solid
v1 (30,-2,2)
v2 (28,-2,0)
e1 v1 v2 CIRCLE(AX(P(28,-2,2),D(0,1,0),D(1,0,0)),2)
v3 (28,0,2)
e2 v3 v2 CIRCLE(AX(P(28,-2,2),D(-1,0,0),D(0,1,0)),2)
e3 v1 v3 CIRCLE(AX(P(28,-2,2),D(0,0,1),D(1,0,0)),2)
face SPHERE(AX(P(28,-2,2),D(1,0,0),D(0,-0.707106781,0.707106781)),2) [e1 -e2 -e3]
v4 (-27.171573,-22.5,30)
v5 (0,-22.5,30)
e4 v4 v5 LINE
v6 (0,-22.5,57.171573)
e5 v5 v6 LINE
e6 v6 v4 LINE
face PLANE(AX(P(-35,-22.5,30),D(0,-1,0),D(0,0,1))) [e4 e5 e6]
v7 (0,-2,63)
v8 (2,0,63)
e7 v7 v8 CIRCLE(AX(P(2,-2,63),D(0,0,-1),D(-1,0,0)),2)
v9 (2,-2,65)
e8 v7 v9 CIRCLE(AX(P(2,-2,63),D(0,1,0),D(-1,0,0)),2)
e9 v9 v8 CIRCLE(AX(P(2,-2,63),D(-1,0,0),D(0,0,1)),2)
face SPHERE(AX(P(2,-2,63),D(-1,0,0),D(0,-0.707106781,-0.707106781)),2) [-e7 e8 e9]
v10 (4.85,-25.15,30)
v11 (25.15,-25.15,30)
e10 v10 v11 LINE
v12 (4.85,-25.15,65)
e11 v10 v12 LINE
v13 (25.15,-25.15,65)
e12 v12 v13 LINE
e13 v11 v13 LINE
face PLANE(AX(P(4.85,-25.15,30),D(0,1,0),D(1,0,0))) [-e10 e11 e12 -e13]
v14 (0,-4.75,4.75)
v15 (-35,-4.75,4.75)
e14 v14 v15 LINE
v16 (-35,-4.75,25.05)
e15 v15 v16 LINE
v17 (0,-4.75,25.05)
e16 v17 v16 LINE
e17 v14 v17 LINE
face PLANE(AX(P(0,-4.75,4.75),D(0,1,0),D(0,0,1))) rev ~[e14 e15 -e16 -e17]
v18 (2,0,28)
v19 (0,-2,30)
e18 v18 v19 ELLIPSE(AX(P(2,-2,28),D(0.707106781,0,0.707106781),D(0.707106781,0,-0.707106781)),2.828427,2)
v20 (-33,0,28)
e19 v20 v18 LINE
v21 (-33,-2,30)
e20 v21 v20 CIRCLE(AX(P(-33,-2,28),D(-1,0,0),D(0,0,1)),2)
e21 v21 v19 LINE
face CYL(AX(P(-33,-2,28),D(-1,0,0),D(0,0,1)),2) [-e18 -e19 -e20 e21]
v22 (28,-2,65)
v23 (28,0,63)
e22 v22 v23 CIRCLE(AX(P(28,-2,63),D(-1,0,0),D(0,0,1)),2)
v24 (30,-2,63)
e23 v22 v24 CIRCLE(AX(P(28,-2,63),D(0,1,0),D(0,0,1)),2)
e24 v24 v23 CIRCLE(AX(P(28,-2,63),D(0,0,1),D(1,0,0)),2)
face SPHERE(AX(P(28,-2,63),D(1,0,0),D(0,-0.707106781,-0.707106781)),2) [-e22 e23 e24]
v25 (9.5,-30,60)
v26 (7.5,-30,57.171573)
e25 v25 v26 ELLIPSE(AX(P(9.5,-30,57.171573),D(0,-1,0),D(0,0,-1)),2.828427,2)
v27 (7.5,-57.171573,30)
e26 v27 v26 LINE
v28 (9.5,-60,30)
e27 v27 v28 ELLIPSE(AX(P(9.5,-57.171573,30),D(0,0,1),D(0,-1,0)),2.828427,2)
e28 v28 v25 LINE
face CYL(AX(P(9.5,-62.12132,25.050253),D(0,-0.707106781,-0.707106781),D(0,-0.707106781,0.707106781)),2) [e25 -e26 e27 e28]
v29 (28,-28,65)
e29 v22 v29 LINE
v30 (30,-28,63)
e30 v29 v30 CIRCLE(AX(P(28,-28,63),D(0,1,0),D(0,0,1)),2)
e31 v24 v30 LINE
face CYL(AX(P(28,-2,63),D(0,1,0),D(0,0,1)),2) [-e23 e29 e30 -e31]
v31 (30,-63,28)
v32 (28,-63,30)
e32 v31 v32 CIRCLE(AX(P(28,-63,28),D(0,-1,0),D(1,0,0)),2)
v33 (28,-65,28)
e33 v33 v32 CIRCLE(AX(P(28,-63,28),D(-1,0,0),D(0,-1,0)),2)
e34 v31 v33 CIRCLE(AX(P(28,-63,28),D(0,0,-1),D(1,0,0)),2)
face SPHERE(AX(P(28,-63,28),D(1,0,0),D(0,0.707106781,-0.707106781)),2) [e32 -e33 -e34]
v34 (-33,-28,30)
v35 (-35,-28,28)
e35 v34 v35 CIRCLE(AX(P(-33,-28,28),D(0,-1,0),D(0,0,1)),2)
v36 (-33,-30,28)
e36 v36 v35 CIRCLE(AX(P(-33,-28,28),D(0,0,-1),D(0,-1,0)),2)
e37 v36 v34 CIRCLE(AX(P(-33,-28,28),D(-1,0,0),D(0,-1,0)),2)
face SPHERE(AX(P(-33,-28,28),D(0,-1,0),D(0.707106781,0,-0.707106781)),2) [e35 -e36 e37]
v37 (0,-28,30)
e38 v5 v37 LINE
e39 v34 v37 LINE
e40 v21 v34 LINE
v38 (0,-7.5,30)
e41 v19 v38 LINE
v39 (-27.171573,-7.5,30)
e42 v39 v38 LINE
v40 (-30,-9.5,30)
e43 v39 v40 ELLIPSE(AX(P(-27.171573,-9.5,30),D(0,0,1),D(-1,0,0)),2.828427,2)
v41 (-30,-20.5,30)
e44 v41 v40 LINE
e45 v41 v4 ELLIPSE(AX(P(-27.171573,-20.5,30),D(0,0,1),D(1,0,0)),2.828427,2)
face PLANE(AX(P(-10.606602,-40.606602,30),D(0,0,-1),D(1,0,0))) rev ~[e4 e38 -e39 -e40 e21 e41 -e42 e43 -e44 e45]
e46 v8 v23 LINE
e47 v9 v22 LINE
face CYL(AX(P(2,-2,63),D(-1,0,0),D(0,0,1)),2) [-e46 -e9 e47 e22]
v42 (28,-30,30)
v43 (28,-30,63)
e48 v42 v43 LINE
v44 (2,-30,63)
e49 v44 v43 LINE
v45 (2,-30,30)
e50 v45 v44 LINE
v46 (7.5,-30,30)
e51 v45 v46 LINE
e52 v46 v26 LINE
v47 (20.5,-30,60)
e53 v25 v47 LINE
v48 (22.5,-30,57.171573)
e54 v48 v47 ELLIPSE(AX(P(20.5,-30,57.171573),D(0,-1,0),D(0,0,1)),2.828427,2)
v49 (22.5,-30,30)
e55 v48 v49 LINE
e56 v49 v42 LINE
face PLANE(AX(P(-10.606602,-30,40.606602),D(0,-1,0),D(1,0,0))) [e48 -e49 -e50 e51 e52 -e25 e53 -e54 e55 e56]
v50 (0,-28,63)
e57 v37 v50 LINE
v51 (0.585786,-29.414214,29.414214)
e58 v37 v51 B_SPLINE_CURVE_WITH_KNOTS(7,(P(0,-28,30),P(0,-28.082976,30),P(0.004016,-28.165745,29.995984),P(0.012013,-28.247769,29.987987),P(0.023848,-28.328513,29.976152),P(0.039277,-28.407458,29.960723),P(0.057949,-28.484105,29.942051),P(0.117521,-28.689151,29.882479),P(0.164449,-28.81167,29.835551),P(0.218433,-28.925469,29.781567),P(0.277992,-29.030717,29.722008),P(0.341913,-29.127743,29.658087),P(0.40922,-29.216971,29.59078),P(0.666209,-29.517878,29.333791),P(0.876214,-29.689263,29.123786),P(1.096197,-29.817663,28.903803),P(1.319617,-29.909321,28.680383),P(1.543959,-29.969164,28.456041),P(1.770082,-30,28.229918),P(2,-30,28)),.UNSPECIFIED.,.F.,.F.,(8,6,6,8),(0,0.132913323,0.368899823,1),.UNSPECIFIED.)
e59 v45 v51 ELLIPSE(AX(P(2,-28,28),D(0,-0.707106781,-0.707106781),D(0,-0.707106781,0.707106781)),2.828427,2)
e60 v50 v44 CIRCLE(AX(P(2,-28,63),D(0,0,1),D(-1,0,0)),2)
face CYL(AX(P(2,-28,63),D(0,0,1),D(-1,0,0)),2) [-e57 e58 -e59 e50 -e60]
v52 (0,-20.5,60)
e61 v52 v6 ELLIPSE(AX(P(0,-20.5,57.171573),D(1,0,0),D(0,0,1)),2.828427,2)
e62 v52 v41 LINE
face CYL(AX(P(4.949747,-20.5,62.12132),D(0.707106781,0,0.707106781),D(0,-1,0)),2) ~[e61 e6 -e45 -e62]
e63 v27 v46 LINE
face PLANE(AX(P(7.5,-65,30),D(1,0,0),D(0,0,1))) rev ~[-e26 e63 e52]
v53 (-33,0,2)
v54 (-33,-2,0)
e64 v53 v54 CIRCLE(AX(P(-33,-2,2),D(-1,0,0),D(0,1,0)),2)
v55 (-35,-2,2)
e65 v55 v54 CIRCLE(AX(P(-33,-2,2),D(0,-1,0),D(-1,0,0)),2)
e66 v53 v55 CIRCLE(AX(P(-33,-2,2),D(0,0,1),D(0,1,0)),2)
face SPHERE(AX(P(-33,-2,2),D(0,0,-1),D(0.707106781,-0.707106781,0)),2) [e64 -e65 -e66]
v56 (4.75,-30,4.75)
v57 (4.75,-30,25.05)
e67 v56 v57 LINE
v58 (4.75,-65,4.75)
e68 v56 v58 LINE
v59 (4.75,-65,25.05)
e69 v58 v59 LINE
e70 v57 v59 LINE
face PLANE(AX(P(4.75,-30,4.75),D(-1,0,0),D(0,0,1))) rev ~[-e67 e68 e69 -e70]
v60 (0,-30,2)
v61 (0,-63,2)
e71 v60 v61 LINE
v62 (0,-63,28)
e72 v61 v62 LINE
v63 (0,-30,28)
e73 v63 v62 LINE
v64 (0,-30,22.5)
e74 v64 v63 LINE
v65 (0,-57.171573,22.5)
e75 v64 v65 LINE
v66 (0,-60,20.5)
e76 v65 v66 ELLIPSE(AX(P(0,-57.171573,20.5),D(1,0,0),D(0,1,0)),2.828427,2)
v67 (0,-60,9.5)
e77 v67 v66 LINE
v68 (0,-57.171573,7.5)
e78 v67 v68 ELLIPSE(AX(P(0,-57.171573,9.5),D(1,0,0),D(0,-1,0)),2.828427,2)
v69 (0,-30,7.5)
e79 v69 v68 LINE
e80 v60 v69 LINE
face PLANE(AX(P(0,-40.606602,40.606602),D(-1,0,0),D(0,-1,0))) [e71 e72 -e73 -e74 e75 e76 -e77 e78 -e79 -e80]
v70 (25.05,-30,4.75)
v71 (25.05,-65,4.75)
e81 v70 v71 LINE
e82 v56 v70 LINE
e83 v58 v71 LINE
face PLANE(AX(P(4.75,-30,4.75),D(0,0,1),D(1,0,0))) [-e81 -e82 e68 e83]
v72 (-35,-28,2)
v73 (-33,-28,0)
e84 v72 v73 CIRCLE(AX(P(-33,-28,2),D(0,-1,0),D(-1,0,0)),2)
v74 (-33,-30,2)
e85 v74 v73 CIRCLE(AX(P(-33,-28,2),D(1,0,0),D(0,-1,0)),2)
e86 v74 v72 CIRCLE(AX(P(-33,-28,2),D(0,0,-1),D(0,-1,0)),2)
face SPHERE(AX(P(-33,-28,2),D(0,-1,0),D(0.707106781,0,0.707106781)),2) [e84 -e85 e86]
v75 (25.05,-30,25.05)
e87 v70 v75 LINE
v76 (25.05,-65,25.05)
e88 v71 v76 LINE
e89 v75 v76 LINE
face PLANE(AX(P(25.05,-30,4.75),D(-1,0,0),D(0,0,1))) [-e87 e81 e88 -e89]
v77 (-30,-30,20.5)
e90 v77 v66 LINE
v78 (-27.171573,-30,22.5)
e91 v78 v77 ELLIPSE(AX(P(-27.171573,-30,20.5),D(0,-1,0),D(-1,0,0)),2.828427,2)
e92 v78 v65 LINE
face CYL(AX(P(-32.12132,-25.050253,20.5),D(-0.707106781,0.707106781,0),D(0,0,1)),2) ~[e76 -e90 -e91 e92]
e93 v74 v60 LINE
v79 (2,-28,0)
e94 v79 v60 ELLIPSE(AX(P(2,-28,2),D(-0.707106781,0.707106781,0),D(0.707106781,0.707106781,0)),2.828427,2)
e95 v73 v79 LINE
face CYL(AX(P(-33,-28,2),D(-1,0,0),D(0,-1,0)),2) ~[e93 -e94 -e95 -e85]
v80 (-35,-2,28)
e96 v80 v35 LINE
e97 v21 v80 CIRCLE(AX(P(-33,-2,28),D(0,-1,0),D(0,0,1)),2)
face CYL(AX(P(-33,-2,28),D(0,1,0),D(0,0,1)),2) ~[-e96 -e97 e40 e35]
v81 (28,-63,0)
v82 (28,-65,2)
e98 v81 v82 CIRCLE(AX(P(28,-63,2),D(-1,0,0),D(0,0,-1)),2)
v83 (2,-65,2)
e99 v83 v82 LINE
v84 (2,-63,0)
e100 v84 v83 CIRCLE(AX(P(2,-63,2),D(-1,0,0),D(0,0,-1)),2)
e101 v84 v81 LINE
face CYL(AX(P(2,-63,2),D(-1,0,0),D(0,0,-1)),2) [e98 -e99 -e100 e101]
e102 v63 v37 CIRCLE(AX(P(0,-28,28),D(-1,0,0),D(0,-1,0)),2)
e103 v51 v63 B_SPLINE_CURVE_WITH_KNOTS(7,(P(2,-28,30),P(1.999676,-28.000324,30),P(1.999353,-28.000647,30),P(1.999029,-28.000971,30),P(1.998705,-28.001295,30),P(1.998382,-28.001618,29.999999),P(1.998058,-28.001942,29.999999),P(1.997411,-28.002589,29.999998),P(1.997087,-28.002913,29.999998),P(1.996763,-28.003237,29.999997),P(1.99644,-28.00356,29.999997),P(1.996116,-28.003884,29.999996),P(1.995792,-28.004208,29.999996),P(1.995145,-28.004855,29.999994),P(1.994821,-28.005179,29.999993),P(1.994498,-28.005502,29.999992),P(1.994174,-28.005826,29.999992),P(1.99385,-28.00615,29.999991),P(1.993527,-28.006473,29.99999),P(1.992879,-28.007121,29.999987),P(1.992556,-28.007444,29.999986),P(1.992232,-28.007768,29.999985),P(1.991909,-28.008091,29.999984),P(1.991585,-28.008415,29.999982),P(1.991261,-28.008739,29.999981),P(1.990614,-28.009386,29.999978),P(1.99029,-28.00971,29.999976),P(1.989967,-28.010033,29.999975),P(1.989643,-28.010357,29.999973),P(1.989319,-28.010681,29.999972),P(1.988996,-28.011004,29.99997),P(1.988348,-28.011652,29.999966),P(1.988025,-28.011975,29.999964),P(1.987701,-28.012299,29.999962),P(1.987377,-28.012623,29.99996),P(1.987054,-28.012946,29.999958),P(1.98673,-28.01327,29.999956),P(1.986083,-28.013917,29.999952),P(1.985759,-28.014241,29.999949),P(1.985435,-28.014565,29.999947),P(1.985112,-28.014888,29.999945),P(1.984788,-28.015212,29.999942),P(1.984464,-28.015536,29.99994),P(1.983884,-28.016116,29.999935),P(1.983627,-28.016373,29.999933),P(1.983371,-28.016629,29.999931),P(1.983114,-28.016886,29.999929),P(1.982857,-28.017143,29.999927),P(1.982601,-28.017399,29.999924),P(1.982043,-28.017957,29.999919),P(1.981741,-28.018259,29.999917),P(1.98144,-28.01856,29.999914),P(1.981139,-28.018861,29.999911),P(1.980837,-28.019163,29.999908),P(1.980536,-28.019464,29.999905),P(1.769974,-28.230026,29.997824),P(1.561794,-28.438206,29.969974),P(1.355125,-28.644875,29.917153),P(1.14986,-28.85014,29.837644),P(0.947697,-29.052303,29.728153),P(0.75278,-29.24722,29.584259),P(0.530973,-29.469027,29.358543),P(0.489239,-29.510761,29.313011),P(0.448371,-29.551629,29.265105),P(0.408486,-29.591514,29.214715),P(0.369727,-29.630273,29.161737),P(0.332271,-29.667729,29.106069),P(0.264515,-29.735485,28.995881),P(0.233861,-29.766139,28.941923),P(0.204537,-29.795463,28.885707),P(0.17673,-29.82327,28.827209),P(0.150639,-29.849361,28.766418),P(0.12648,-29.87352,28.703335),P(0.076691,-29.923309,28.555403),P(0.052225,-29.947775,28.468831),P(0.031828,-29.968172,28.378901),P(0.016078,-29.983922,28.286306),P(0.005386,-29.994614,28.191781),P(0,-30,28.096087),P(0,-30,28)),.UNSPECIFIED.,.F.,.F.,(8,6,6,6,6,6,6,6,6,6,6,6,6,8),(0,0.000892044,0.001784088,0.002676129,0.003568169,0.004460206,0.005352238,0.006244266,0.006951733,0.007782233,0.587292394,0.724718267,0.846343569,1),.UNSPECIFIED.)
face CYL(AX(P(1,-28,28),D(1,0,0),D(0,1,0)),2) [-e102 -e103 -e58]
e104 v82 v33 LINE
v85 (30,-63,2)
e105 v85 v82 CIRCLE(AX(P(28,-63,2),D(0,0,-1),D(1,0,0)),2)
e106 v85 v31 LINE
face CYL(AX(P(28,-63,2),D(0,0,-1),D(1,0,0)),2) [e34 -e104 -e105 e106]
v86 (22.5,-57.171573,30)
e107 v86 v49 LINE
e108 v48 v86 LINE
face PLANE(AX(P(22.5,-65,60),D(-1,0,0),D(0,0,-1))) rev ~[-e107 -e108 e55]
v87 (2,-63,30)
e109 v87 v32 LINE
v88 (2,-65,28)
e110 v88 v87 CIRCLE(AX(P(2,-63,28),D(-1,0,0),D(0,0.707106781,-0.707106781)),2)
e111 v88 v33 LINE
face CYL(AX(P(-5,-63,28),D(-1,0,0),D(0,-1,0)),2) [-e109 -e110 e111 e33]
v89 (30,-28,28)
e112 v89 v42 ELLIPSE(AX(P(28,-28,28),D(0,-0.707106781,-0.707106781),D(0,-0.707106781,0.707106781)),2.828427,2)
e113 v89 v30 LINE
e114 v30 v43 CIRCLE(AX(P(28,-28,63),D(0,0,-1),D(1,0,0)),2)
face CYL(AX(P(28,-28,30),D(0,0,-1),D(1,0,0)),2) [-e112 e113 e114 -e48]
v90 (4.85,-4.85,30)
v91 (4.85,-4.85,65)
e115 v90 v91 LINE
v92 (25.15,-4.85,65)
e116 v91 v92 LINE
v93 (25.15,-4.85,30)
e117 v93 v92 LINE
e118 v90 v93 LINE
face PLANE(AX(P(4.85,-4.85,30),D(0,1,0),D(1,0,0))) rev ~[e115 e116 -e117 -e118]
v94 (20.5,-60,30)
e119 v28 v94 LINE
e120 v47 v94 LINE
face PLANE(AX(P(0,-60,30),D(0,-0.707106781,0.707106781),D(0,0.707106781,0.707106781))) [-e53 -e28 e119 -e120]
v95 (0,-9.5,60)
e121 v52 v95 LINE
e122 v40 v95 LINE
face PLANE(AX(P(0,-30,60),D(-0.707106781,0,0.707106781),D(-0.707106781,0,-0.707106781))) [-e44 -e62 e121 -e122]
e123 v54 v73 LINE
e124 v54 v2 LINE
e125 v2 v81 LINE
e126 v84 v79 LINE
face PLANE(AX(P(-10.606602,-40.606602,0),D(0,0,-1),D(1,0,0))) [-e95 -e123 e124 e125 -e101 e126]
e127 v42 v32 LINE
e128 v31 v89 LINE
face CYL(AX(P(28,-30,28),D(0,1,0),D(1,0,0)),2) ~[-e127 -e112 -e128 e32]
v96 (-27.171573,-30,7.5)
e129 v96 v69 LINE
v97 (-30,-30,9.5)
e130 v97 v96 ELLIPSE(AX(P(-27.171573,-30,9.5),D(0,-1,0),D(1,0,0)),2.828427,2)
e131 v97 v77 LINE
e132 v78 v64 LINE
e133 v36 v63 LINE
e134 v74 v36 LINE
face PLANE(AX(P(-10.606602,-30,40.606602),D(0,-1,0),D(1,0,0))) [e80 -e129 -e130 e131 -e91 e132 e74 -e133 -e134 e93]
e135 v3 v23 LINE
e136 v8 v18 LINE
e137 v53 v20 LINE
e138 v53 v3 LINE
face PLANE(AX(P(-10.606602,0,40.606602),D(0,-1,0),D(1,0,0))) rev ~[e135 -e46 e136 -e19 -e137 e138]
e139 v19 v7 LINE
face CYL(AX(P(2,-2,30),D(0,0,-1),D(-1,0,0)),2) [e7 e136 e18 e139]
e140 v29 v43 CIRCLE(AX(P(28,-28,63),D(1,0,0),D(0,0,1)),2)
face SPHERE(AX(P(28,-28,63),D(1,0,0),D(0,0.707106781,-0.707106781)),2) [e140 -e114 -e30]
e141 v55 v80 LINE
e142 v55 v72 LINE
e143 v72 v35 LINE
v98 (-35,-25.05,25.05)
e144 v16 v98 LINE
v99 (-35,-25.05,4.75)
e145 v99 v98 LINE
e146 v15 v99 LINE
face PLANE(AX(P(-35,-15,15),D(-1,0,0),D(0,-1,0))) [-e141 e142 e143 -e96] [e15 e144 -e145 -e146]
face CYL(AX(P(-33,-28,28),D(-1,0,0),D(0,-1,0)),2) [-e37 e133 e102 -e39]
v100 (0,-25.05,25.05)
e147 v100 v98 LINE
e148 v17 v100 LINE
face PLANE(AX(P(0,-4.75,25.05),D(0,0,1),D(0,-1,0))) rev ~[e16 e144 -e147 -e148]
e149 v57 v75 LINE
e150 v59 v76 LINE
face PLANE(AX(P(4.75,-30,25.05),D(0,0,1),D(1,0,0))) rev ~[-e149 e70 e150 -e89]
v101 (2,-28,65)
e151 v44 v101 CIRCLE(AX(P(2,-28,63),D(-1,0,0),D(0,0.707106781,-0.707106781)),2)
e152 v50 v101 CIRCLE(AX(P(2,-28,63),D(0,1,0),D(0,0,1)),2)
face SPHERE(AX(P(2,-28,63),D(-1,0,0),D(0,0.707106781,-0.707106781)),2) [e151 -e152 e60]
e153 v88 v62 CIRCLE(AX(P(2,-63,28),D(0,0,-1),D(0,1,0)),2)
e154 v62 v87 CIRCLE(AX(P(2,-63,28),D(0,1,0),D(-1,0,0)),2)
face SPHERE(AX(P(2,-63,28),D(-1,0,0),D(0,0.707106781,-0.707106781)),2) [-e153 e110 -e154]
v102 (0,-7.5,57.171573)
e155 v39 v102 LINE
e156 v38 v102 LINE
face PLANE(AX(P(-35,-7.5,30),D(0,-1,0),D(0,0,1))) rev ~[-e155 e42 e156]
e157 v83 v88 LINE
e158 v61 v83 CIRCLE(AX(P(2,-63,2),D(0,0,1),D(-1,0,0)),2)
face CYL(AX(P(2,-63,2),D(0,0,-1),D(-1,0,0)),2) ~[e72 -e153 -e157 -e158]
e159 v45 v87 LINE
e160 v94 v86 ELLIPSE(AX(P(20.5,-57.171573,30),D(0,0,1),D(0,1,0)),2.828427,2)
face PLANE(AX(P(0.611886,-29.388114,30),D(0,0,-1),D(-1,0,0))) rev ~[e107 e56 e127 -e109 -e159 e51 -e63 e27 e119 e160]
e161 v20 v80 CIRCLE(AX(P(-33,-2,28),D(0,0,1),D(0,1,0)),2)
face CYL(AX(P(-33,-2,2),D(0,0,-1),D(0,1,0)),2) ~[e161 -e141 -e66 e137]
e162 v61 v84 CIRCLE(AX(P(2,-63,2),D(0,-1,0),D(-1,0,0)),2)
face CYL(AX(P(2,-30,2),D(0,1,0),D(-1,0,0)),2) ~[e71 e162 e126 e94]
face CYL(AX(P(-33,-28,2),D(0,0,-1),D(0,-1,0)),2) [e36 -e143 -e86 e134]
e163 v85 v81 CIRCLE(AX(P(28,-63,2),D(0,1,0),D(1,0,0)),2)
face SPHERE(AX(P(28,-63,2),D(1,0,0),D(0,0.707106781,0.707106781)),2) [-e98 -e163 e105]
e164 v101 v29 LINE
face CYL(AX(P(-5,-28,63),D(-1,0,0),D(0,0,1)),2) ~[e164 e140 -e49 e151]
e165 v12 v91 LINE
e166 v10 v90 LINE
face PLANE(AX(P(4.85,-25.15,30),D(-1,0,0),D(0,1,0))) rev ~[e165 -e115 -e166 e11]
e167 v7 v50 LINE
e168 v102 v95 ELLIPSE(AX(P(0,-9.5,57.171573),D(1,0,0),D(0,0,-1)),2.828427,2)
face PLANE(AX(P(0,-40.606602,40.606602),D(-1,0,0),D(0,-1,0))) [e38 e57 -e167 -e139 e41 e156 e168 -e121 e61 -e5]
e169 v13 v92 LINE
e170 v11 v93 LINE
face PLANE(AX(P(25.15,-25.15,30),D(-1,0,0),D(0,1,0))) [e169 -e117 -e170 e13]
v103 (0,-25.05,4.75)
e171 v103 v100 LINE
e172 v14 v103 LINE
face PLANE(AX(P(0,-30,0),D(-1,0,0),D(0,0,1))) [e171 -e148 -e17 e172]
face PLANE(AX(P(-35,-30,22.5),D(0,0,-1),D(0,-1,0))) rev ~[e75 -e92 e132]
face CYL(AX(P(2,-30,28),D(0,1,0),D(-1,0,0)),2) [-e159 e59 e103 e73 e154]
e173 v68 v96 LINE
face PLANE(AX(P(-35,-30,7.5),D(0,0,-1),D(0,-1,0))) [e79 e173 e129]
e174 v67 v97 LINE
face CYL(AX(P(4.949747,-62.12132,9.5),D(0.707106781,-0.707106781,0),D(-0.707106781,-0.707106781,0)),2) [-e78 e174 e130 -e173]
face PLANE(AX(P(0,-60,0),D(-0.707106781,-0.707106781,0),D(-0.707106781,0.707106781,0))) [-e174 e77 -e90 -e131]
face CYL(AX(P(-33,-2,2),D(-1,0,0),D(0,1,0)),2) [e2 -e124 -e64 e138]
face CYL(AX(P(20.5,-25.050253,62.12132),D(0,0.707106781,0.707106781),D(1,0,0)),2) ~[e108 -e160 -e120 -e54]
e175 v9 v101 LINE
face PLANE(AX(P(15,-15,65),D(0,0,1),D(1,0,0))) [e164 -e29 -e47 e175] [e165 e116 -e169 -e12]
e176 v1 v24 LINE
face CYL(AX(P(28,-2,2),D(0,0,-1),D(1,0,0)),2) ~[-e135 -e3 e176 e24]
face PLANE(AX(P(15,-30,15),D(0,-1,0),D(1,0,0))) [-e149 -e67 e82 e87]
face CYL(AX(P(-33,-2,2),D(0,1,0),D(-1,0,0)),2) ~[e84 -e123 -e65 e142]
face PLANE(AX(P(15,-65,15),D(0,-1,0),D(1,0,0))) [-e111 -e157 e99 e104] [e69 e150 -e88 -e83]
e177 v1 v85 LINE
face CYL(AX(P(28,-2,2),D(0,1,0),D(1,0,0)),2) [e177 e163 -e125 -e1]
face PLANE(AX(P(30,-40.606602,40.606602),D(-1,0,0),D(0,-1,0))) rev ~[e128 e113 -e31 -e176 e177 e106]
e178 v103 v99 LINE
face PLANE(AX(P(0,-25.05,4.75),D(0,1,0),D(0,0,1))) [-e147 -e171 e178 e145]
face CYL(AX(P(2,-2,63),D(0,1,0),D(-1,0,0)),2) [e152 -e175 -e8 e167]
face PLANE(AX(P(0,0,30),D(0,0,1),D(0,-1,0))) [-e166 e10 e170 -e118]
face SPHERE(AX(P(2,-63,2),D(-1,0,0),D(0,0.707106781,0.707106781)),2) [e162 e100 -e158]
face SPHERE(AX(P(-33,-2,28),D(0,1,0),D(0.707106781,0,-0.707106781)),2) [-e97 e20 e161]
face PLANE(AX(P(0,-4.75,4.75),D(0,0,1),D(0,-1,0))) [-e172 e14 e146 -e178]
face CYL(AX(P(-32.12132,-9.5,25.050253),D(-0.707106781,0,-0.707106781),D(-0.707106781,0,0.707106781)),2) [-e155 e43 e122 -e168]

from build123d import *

# Parameters (mm, degrees)
F0_W           = 30
F0_H           = 30
F1_DEPTH       = 30
F2_W           = 30
F2_H           = 30
F2_W_2         = 20.3
F2_H_2         = 20.3
F3_DEPTH       = 35
F4_W           = 30
F4_H           = 30
F4_W_2         = 20.3
F4_H_2         = 20.3
F5_DEPTH       = 35
F6_W           = 30
F6_H           = 30
F6_W_2         = 20.3
F6_H_2         = 20.3
F7_DEPTH       = 35
F9_DEPTH       = 30
F10_W          = 7.5
F10_H          = 30
F11_DEPTH      = 35
F13_DEPTH      = 30
F15_DEPTH      = 35
F17_DEPTH      = 30
F18_W          = 35
F18_H          = 7.5
F19_DEPTH      = 35
F20_T1_DEPTH   = 26
F20_T3_DEPTH   = 26
F20_T5_DEPTH   = 33
F20_T7_DEPTH   = 33
F20_T9_DEPTH   = 26
F20_T11_DEPTH  = 33
F20_T13_DEPTH  = 61
F20_T15_DEPTH  = 61
F20_T17_DEPTH  = 33
F20_T19_DEPTH  = 33
F20_T21_DEPTH  = 33
F20_T23_DEPTH  = 61
F20_S27_W      = 2
F20_S27_H      = 2
F20_T28_DEPTH  = 2
F20_S33_W      = 2
F20_S33_H      = 2
F20_T34_DEPTH  = 2
F20_S39_W      = 2
F20_S39_H      = 2
F20_T40_DEPTH  = 2
F20_S45_W      = 2
F20_S45_H      = 2
F20_T46_DEPTH  = 2
F20_S51_W      = 2
F20_S51_H      = 2
F20_T52_DEPTH  = 2
F20_S57_W      = 2
F20_S57_H      = 2
F20_T58_DEPTH  = 2
F20_S63_W      = 2
F20_S63_H      = 2
F20_T64_DEPTH  = 2
F20_S69_W      = 2
F20_S69_H      = 2
F20_T70_DEPTH  = 2
F20_S75_W      = 2
F20_S75_H      = 2
F20_T76_DEPTH  = 2
F20_S81_W      = 2
F20_S81_H      = 2
F20_T82_DEPTH  = 2
F20_S87_W      = 2
F20_S87_H      = 2
F20_T88_DEPTH  = 2
F20_T94_DEPTH  = 52.4264068712
F20_T100_DEPTH = 52.4264068712
F20_T106_DEPTH = 52.4264068712
F20_T112_DEPTH = 52.4264068712
F20_T118_DEPTH = 52.4264068712
F20_T124_DEPTH = 52.4264068712
F20_T131_DEPTH = 38
F20_T135_DEPTH = 38
F20_T142_DEPTH = 38
F20_T146_DEPTH = 38
F20_T153_DEPTH = 38
F20_T157_DEPTH = 38
F21_T1_DEPTH   = 33
F21_T3_DEPTH   = 33
F21_S7_W       = 2
F21_S7_H       = 2
F21_T8_DEPTH   = 2
F21_S13_W      = 2
F21_S13_H      = 2
F21_T14_DEPTH  = 2
F21_T21_DEPTH  = 38
F21_S23_R      = 1.9999999999
F21_T24_DEPTH  = 21
F21_T27_DEPTH  = 38
F21_S28_R      = 1.9999999999
F21_T29_DEPTH  = 21


# Not quite as in the source:
# - a fillet or chamfer that OpenCascade refuses, or shapes differently, is made with other operations: its cross-section is extruded or revolved along the edge and cut away or added


with BuildPart() as f1:
    # F0 (on Front) → F1 (new body)
    with BuildSketch(Plane.XZ):
        with Locations((15, 15)):
            Rectangle(F0_W, F0_H)
    extrude(amount=F1_DEPTH)

    # F2 (on face) → F3 (join)
    with BuildSketch(Plane.XZ.offset(30)):
        with Locations((15, 15)):
            Rectangle(F2_W, F2_H)
        with Locations((14.9, 14.9)):
            Rectangle(F2_W_2, F2_H_2, mode=Mode.SUBTRACT)
    extrude(amount=F3_DEPTH)

    # F4 (on face) → F5 (join)
    with BuildSketch(Plane(origin=(0, 0, 0), x_dir=(0, -1, 0), z_dir=(-1, 0, 0))):
        with Locations((15, 15)):
            Rectangle(F4_W, F4_H)
        with Locations((14.9, 14.9)):
            Rectangle(F4_W_2, F4_H_2, mode=Mode.SUBTRACT)
    extrude(amount=F5_DEPTH)

    # F6 (on face) → F7 (join)
    with BuildSketch(Plane.XY.offset(30)):
        with Locations((15, -15)):
            Rectangle(F6_W, F6_H)
        with Locations((15, -15)):
            Rectangle(F6_W_2, F6_H_2, mode=Mode.SUBTRACT)
    extrude(amount=F7_DEPTH)

    # F8 (on face) → F9 (join)
    with BuildSketch(Plane.XZ.offset(30)):
        Polygon((-30, 30), (0, 30), (0, 60), align=None)
    extrude(amount=-F9_DEPTH)

    # F10 (on face) → F11 (cut)
    with BuildSketch(Plane(origin=(-35, 0, 0), x_dir=(0, -1, 0), z_dir=(-1, 0, 0))):
        with Locations((3.75, 45)):
            Rectangle(F10_W, F10_H)
        with Locations((26.25, 45)):
            Rectangle(F10_W, F10_H)
    extrude(amount=-F11_DEPTH, mode=Mode.SUBTRACT)

    # F12 (on face) → F13 (join)
    with BuildSketch(Plane(origin=(0, 0, 0), x_dir=(0, -1, 0), z_dir=(-1, 0, 0))):
        Polygon((30, 60), (30, 30), (60, 30), align=None)
    extrude(amount=-F13_DEPTH)

    # F14 (on face) → F15 (cut)
    with BuildSketch(Plane.XZ.offset(65)):
        Polygon((22.5, 60), (22.5, 30), (30, 30), (30, 65), (0, 65), (0, 30), (7.5, 30), (7.5, 60), align=None)
    extrude(amount=-F15_DEPTH, mode=Mode.SUBTRACT)

    # F16 (on face) → F17 (join)
    with BuildSketch(Plane(origin=(0, 0, 0), x_dir=(1, 0, 0), z_dir=(0, 0, -1))):
        Polygon((-30, 30), (0, 30), (0, 60), align=None)
    extrude(amount=-F17_DEPTH)

    # F18 (on face) → F19 (cut)
    with BuildSketch(Plane(origin=(-35, 0, 0), x_dir=(0, -1, 0), z_dir=(-1, 0, 0))):
        with Locations((47.5, 26.25)):
            Rectangle(F18_W, F18_H)
        with Locations((47.5, 3.75)):
            Rectangle(F18_W, F18_H)
    extrude(amount=-F19_DEPTH, mode=Mode.SUBTRACT)

    # F20: fillet of radius 2 on 28 edges, made by hand

    # F20_s2 → F20_t1 (cut)
    with BuildSketch(Plane.XZ.offset(2)):
        with BuildLine():
            ThreePointArc((-33, 30), (-34.4142135624, 29.4142135624), (-35, 28))
            Line((-35, 28), (-35, 30))
            Line((-35, 30), (-33, 30))
        make_face()
        with BuildLine():
            ThreePointArc((-35, 2), (-34.4142135624, 0.5857864376), (-33, 0))
            Line((-33, 0), (-35, 0))
            Line((-35, 0), (-35, 2))
        make_face()
        with BuildLine():
            ThreePointArc((28, 65), (29.4142135624, 64.4142135624), (30, 63))
            Line((30, 63), (30, 65))
            Line((30, 65), (28, 65))
        make_face()
    extrude(amount=F20_T1_DEPTH, mode=Mode.SUBTRACT)

    # F20_s4 → F20_t3 (cut)
    with BuildSketch(Plane.XY.offset(2)):
        with BuildLine():
            ThreePointArc((-33, -30), (-34.4142135624, -29.4142135624), (-35, -28))
            Line((-35, -28), (-35, -30))
            Line((-35, -30), (-33, -30))
        make_face()
        with BuildLine():
            ThreePointArc((-33, 0), (-34.4142135624, -0.5857864376), (-35, -2))
            Line((-35, -2), (-35, 0))
            Line((-35, 0), (-33, 0))
        make_face()
        with BuildLine():
            ThreePointArc((30, -63), (29.4142135624, -64.4142135624), (28, -65))
            Line((28, -65), (30, -65))
            Line((30, -65), (30, -63))
        make_face()
    extrude(amount=F20_T3_DEPTH, mode=Mode.SUBTRACT)

    # F20_s6 → F20_t5 (cut)
    with BuildSketch(Plane.XY.offset(2)):
        with BuildLine():
            ThreePointArc((0, -63), (0.5857864376, -64.4142135624), (2, -65))
            Line((2, -65), (0, -65))
            Line((0, -65), (0, -63))
        make_face()
    extrude(amount=F20_T5_DEPTH, mode=Mode.SUBTRACT)

    # F20_s8 → F20_t7 (cut)
    with BuildSketch(Plane.YZ.offset(-5)):
        with BuildLine():
            ThreePointArc((-65, 28), (-64.4142135624, 29.4142135624), (-63, 30))
            Line((-63, 30), (-65, 30))
            Line((-65, 30), (-65, 28))
        make_face()
        with BuildLine():
            ThreePointArc((-28, 65), (-29.4142135624, 64.4142135624), (-30, 63))
            Line((-30, 63), (-30, 65))
            Line((-30, 65), (-28, 65))
        make_face()
    extrude(amount=F20_T7_DEPTH, mode=Mode.SUBTRACT)

    # F20_s10 → F20_t9 (cut)
    with BuildSketch(Plane.YZ.offset(2)):
        with BuildLine():
            ThreePointArc((-63, 0), (-64.4142135624, 0.5857864376), (-65, 2))
            Line((-65, 2), (-65, 0))
            Line((-65, 0), (-63, 0))
        make_face()
        with BuildLine():
            ThreePointArc((-2, 65), (-0.5857864376, 64.4142135624), (0, 63))
            Line((0, 63), (0, 65))
            Line((0, 65), (-2, 65))
        make_face()
    extrude(amount=F20_T9_DEPTH, mode=Mode.SUBTRACT)

    # F20_s12 → F20_t11 (cut)
    with BuildSketch(Plane.XZ.offset(2)):
        with BuildLine():
            ThreePointArc((0, 63), (0.5857864376, 64.4142135624), (2, 65))
            Line((2, 65), (0, 65))
            Line((0, 65), (0, 63))
        make_face()
    extrude(amount=F20_T11_DEPTH, mode=Mode.SUBTRACT)

    # F20_s14 → F20_t13 (cut)
    with BuildSketch(Plane.XY.offset(2)):
        with BuildLine():
            ThreePointArc((30, -2), (29.4142135624, -0.5857864376), (28, 0))
            Line((28, 0), (30, 0))
            Line((30, 0), (30, -2))
        make_face()
    extrude(amount=F20_T13_DEPTH, mode=Mode.SUBTRACT)

    # F20_s16 → F20_t15 (cut)
    with BuildSketch(Plane.XZ.offset(2)):
        with BuildLine():
            ThreePointArc((30, 2), (29.4142135624, 0.5857864376), (28, 0))
            Line((28, 0), (30, 0))
            Line((30, 0), (30, 2))
        make_face()
    extrude(amount=F20_T15_DEPTH, mode=Mode.SUBTRACT)

    # F20_s18 → F20_t17 (cut)
    with BuildSketch(Plane.XZ.offset(30)):
        with BuildLine():
            ThreePointArc((30, 28), (29.4142135624, 29.4142135624), (28, 30))
            Line((28, 30), (30, 30))
            Line((30, 30), (30, 28))
        make_face()
        with BuildLine():
            ThreePointArc((0, 2), (0.5857864376, 0.5857864376), (2, 0))
            Line((2, 0), (0, 0))
            Line((0, 0), (0, 2))
        make_face()
    extrude(amount=F20_T17_DEPTH, mode=Mode.SUBTRACT)

    # F20_s20 → F20_t19 (cut)
    with BuildSketch(Plane.XY.offset(30)):
        with BuildLine():
            ThreePointArc((30, -28), (29.4142135624, -29.4142135624), (28, -30))
            Line((28, -30), (30, -30))
            Line((30, -30), (30, -28))
        make_face()
        with BuildLine():
            ThreePointArc((0, -2), (0.5857864376, -0.5857864376), (2, 0))
            Line((2, 0), (0, 0))
            Line((0, 0), (0, -2))
        make_face()
    extrude(amount=F20_T19_DEPTH, mode=Mode.SUBTRACT)

    # F20_s22 → F20_t21 (cut)
    with BuildSketch(Plane.YZ.offset(-33)):
        with BuildLine():
            ThreePointArc((-30, 2), (-29.4142135624, 0.5857864376), (-28, 0))
            Line((-28, 0), (-30, 0))
            Line((-30, 0), (-30, 2))
        make_face()
        with BuildLine():
            ThreePointArc((-2, 30), (-0.5857864376, 29.4142135624), (0, 28))
            Line((0, 28), (0, 30))
            Line((0, 30), (-2, 30))
        make_face()
        with BuildLine():
            ThreePointArc((-30, 28), (-29.4142135624, 29.4142135624), (-28, 30))
            Line((-28, 30), (-30, 30))
            Line((-30, 30), (-30, 28))
        make_face()
    extrude(amount=F20_T21_DEPTH, mode=Mode.SUBTRACT)

    # F20_s24 → F20_t23 (cut)
    with BuildSketch(Plane.YZ.offset(-33)):
        with BuildLine():
            ThreePointArc((0, 2), (-0.5857864376, 0.5857864376), (-2, 0))
            Line((-2, 0), (0, 0))
            Line((0, 0), (0, 2))
        make_face()
    extrude(amount=F20_T23_DEPTH, mode=Mode.SUBTRACT)


with BuildPart() as f20_tool26:
    # F20_s27 → F20_t28 (new body)
    with BuildSketch(Plane.XZ.offset(2)):
        with Locations((-34, 29)):
            Rectangle(F20_S27_W, F20_S27_H)
    extrude(amount=-F20_T28_DEPTH)

    # F20_s29 → F20_t30 (revolve, cut)
    with BuildSketch(Plane(origin=(-33, -2, 28), x_dir=(0.7071067812, 0, -0.7071067812), z_dir=(0.7071067812, 0, 0.7071067812))):
        with BuildLine():
            ThreePointArc((0, -2), (2, 0), (0, 2))
            Line((0, 2), (0, -2))
        make_face()
    revolve(axis=Axis((-33, -2, 28), (0, 1, 0)), mode=Mode.SUBTRACT)


with BuildPart() as f1_1:
    add(f1.part)

    # F20_t25: cut F20_tool26
    add(f20_tool26.part, mode=Mode.SUBTRACT)


with BuildPart() as f20_tool32:
    # F20_s33 → F20_t34 (new body)
    with BuildSketch(Plane.XZ.offset(28)):
        with Locations((-34, 29)):
            Rectangle(F20_S33_W, F20_S33_H)
    extrude(amount=F20_T34_DEPTH)

    # F20_s35 → F20_t36 (revolve, cut)
    with BuildSketch(Plane(origin=(-33, -28, 28), x_dir=(0.7071067812, 0, -0.7071067812), z_dir=(-0.7071067812, 0, -0.7071067812))):
        with BuildLine():
            ThreePointArc((0, -2), (2, 0), (0, 2))
            Line((0, 2), (0, -2))
        make_face()
    revolve(axis=Axis((-33, -28, 28), (0, -1, 0)), mode=Mode.SUBTRACT)


with BuildPart() as f1_2:
    add(f1_1.part)

    # F20_t31: cut F20_tool32
    add(f20_tool32.part, mode=Mode.SUBTRACT)


with BuildPart() as f20_tool38:
    # F20_s39 → F20_t40 (new body)
    with BuildSketch(Plane.XZ.offset(28)):
        with Locations((-34, 1)):
            Rectangle(F20_S39_W, F20_S39_H)
    extrude(amount=F20_T40_DEPTH)

    # F20_s41 → F20_t42 (revolve, cut)
    with BuildSketch(Plane(origin=(-33, -28, 2), x_dir=(0.7071067812, 0, 0.7071067812), z_dir=(0.7071067812, 0, -0.7071067812))):
        with BuildLine():
            ThreePointArc((0, -2), (2, 0), (0, 2))
            Line((0, 2), (0, -2))
        make_face()
    revolve(axis=Axis((-33, -28, 2), (0, -1, 0)), mode=Mode.SUBTRACT)


with BuildPart() as f1_3:
    add(f1_2.part)

    # F20_t37: cut F20_tool38
    add(f20_tool38.part, mode=Mode.SUBTRACT)


with BuildPart() as f20_tool44:
    # F20_s45 → F20_t46 (new body)
    with BuildSketch(Plane.XY.offset(2)):
        with Locations((-34, -1)):
            Rectangle(F20_S45_W, F20_S45_H)
    extrude(amount=-F20_T46_DEPTH)

    # F20_s47 → F20_t48 (revolve, cut)
    with BuildSketch(Plane(origin=(-33, -2, 2), x_dir=(0.7071067812, -0.7071067812, 0), z_dir=(0.7071067812, 0.7071067812, 0))):
        with BuildLine():
            ThreePointArc((0, -2), (2, 0), (0, 2))
            Line((0, 2), (0, -2))
        make_face()
    revolve(axis=Axis((-33, -2, 2), (0, 0, -1)), mode=Mode.SUBTRACT)


with BuildPart() as f1_4:
    add(f1_3.part)

    # F20_t43: cut F20_tool44
    add(f20_tool44.part, mode=Mode.SUBTRACT)


with BuildPart() as f20_tool50:
    # F20_s51 → F20_t52 (new body)
    with BuildSketch(Plane.YZ.offset(2)):
        with Locations((-64, 1)):
            Rectangle(F20_S51_W, F20_S51_H)
    extrude(amount=-F20_T52_DEPTH)

    # F20_s53 → F20_t54 (revolve, cut)
    with BuildSketch(Plane(origin=(2, -63, 2), x_dir=(0, 0.7071067812, 0.7071067812), z_dir=(0, -0.7071067812, 0.7071067812))):
        with BuildLine():
            ThreePointArc((0, -2), (2, 0), (0, 2))
            Line((0, 2), (0, -2))
        make_face()
    revolve(axis=Axis((2, -63, 2), (-1, 0, 0)), mode=Mode.SUBTRACT)


with BuildPart() as f1_5:
    add(f1_4.part)

    # F20_t49: cut F20_tool50
    add(f20_tool50.part, mode=Mode.SUBTRACT)


with BuildPart() as f20_tool56:
    # F20_s57 → F20_t58 (new body)
    with BuildSketch(Plane.YZ.offset(28)):
        with Locations((-64, 29)):
            Rectangle(F20_S57_W, F20_S57_H)
    extrude(amount=F20_T58_DEPTH)

    # F20_s59 → F20_t60 (revolve, cut)
    with BuildSketch(Plane(origin=(28, -63, 28), x_dir=(0, 0.7071067812, -0.7071067812), z_dir=(0, -0.7071067812, -0.7071067812))):
        with BuildLine():
            ThreePointArc((0, -2), (2, 0), (0, 2))
            Line((0, 2), (0, -2))
        make_face()
    revolve(axis=Axis((28, -63, 28), (1, 0, 0)), mode=Mode.SUBTRACT)


with BuildPart() as f1_6:
    add(f1_5.part)

    # F20_t55: cut F20_tool56
    add(f20_tool56.part, mode=Mode.SUBTRACT)


with BuildPart() as f20_tool62:
    # F20_s63 → F20_t64 (new body)
    with BuildSketch(Plane.YZ.offset(28)):
        with Locations((-64, 1)):
            Rectangle(F20_S63_W, F20_S63_H)
    extrude(amount=F20_T64_DEPTH)

    # F20_s65 → F20_t66 (revolve, cut)
    with BuildSketch(Plane(origin=(28, -63, 2), x_dir=(0, 0.7071067812, 0.7071067812), z_dir=(0, 0.7071067812, -0.7071067812))):
        with BuildLine():
            ThreePointArc((0, -2), (2, 0), (0, 2))
            Line((0, 2), (0, -2))
        make_face()
    revolve(axis=Axis((28, -63, 2), (1, 0, 0)), mode=Mode.SUBTRACT)


with BuildPart() as f1_7:
    add(f1_6.part)

    # F20_t61: cut F20_tool62
    add(f20_tool62.part, mode=Mode.SUBTRACT)


with BuildPart() as f20_tool68:
    # F20_s69 → F20_t70 (new body)
    with BuildSketch(Plane.YZ.offset(28)):
        with Locations((-29, 64)):
            Rectangle(F20_S69_W, F20_S69_H)
    extrude(amount=F20_T70_DEPTH)

    # F20_s71 → F20_t72 (revolve, cut)
    with BuildSketch(Plane(origin=(28, -28, 63), x_dir=(0, 0.7071067812, -0.7071067812), z_dir=(0, -0.7071067812, -0.7071067812))):
        with BuildLine():
            ThreePointArc((0, -2), (2, 0), (0, 2))
            Line((0, 2), (0, -2))
        make_face()
    revolve(axis=Axis((28, -28, 63), (1, 0, 0)), mode=Mode.SUBTRACT)


with BuildPart() as f1_8:
    add(f1_7.part)

    # F20_t67: cut F20_tool68
    add(f20_tool68.part, mode=Mode.SUBTRACT)


with BuildPart() as f20_tool74:
    # F20_s75 → F20_t76 (new body)
    with BuildSketch(Plane.YZ.offset(28)):
        with Locations((-1, 64)):
            Rectangle(F20_S75_W, F20_S75_H)
    extrude(amount=F20_T76_DEPTH)

    # F20_s77 → F20_t78 (revolve, cut)
    with BuildSketch(Plane(origin=(28, -2, 63), x_dir=(0, -0.7071067812, -0.7071067812), z_dir=(0, -0.7071067812, 0.7071067812))):
        with BuildLine():
            ThreePointArc((0, -2), (2, 0), (0, 2))
            Line((0, 2), (0, -2))
        make_face()
    revolve(axis=Axis((28, -2, 63), (1, 0, 0)), mode=Mode.SUBTRACT)


with BuildPart() as f1_9:
    add(f1_8.part)

    # F20_t73: cut F20_tool74
    add(f20_tool74.part, mode=Mode.SUBTRACT)


with BuildPart() as f20_tool80:
    # F20_s81 → F20_t82 (new body)
    with BuildSketch(Plane.YZ.offset(2)):
        with Locations((-1, 64)):
            Rectangle(F20_S81_W, F20_S81_H)
    extrude(amount=-F20_T82_DEPTH)

    # F20_s83 → F20_t84 (revolve, cut)
    with BuildSketch(Plane(origin=(2, -2, 63), x_dir=(0, -0.7071067812, -0.7071067812), z_dir=(0, 0.7071067812, -0.7071067812))):
        with BuildLine():
            ThreePointArc((0, -2), (2, 0), (0, 2))
            Line((0, 2), (0, -2))
        make_face()
    revolve(axis=Axis((2, -2, 63), (-1, 0, 0)), mode=Mode.SUBTRACT)


with BuildPart() as f1_10:
    add(f1_9.part)

    # F20_t79: cut F20_tool80
    add(f20_tool80.part, mode=Mode.SUBTRACT)


with BuildPart() as f20_tool86:
    # F20_s87 → F20_t88 (new body)
    with BuildSketch(Plane.YZ.offset(28)):
        with Locations((-1, 1)):
            Rectangle(F20_S87_W, F20_S87_H)
    extrude(amount=F20_T88_DEPTH)

    # F20_s89 → F20_t90 (revolve, cut)
    with BuildSketch(Plane(origin=(28, -2, 2), x_dir=(0, -0.7071067812, 0.7071067812), z_dir=(0, 0.7071067812, 0.7071067812))):
        with BuildLine():
            ThreePointArc((0, -2), (2, 0), (0, 2))
            Line((0, 2), (0, -2))
        make_face()
    revolve(axis=Axis((28, -2, 2), (1, 0, 0)), mode=Mode.SUBTRACT)


with BuildPart() as f1_11:
    add(f1_10.part)

    # F20_t85: cut F20_tool86
    add(f20_tool86.part, mode=Mode.SUBTRACT)


with BuildPart() as f20_tool92:
    # F20_s93 → F20_t94 (new body)
    with BuildSketch(Plane(origin=(0, -18.5355339059, -18.5355339059), x_dir=(1, 0, 0), z_dir=(0, 0.7071067812, 0.7071067812))):
        with BuildLine():
            ThreePointArc((9.5, -63.6396103068), (8.0857864376, -63.0538238692), (7.5, -61.6396103068))
            Line((7.5, -61.6396103068), (7.5, -63.6396103068))
            Line((7.5, -63.6396103068), (9.5, -63.6396103068))
        make_face()
    extrude(amount=F20_T94_DEPTH)

    split(bisect_by=Plane.XZ.offset(30), keep=Keep.TOP)

    split(bisect_by=Plane.XY.offset(30), keep=Keep.TOP)


with BuildPart() as f1_12:
    add(f1_11.part)

    # F20_t91: cut F20_tool92
    add(f20_tool92.part, mode=Mode.SUBTRACT)


with BuildPart() as f20_tool98:
    # F20_s99 → F20_t100 (new body)
    with BuildSketch(Plane(origin=(0, 18.5355339059, 18.5355339059), x_dir=(1, 0, 0), z_dir=(0, -0.7071067812, -0.7071067812))):
        with BuildLine():
            ThreePointArc((22.5, 61.6396103068), (21.9142135624, 63.0538238692), (20.5, 63.6396103068))
            Line((20.5, 63.6396103068), (22.5, 63.6396103068))
            Line((22.5, 63.6396103068), (22.5, 61.6396103068))
        make_face()
    extrude(amount=F20_T100_DEPTH)

    split(bisect_by=Plane.XZ.offset(30), keep=Keep.TOP)

    split(bisect_by=Plane.XY.offset(30), keep=Keep.TOP)


with BuildPart() as f1_13:
    add(f1_12.part)

    # F20_t97: cut F20_tool98
    add(f20_tool98.part, mode=Mode.SUBTRACT)


with BuildPart() as f20_tool104:
    # F20_s105 → F20_t106 (new body)
    with BuildSketch(Plane(origin=(33.5355339059, 0, 33.5355339059), x_dir=(0, 1, 0), z_dir=(-0.7071067812, 0, -0.7071067812))):
        with BuildLine():
            ThreePointArc((-22.5, -40.4264068712), (-21.9142135624, -41.8406204336), (-20.5, -42.4264068712))
            Line((-20.5, -42.4264068712), (-22.5, -42.4264068712))
            Line((-22.5, -42.4264068712), (-22.5, -40.4264068712))
        make_face()
    extrude(amount=F20_T106_DEPTH)

    split(bisect_by=Plane.XY.offset(30), keep=Keep.TOP)

    split(bisect_by=Plane.YZ, keep=Keep.BOTTOM)


with BuildPart() as f1_14:
    add(f1_13.part)

    # F20_t103: cut F20_tool104
    add(f20_tool104.part, mode=Mode.SUBTRACT)


with BuildPart() as f20_tool110:
    # F20_s111 → F20_t112 (new body)
    with BuildSketch(Plane(origin=(-3.5355339059, 0, -3.5355339059), x_dir=(0, 1, 0), z_dir=(0.7071067812, 0, 0.7071067812))):
        with BuildLine():
            ThreePointArc((-9.5, 42.4264068712), (-8.0857864376, 41.8406204336), (-7.5, 40.4264068712))
            Line((-7.5, 40.4264068712), (-7.5, 42.4264068712))
            Line((-7.5, 42.4264068712), (-9.5, 42.4264068712))
        make_face()
    extrude(amount=F20_T112_DEPTH)

    split(bisect_by=Plane.XY.offset(30), keep=Keep.TOP)

    split(bisect_by=Plane.YZ, keep=Keep.BOTTOM)


with BuildPart() as f1_15:
    add(f1_14.part)

    # F20_t109: cut F20_tool110
    add(f20_tool110.part, mode=Mode.SUBTRACT)


with BuildPart() as f20_tool116:
    # F20_s117 → F20_t118 (new body)
    with BuildSketch(Plane(origin=(-3.5355339059, 3.5355339059, 0), x_dir=(0, 0, 1), z_dir=(0.7071067812, -0.7071067812, 0))):
        with BuildLine():
            ThreePointArc((22.5, 40.4264068712), (21.9142135624, 41.8406204336), (20.5, 42.4264068712))
            Line((20.5, 42.4264068712), (22.5, 42.4264068712))
            Line((22.5, 42.4264068712), (22.5, 40.4264068712))
        make_face()
    extrude(amount=F20_T118_DEPTH)

    split(bisect_by=Plane.YZ, keep=Keep.BOTTOM)

    split(bisect_by=Plane.XZ.offset(30), keep=Keep.TOP)


with BuildPart() as f1_16:
    add(f1_15.part)

    # F20_t115: cut F20_tool116
    add(f20_tool116.part, mode=Mode.SUBTRACT)


with BuildPart() as f20_tool122:
    # F20_s123 → F20_t124 (new body)
    with BuildSketch(Plane(origin=(33.5355339059, -33.5355339059, 0), x_dir=(0, 0, 1), z_dir=(-0.7071067812, 0.7071067812, 0))):
        with BuildLine():
            ThreePointArc((9.5, -42.4264068712), (8.0857864376, -41.8406204336), (7.5, -40.4264068712))
            Line((7.5, -40.4264068712), (7.5, -42.4264068712))
            Line((7.5, -42.4264068712), (9.5, -42.4264068712))
        make_face()
    extrude(amount=F20_T124_DEPTH)

    split(bisect_by=Plane.YZ, keep=Keep.BOTTOM)

    split(bisect_by=Plane.XZ.offset(30), keep=Keep.TOP)


with BuildPart() as f1_17:
    add(f1_16.part)

    # F20_t121: cut F20_tool122
    add(f20_tool122.part, mode=Mode.SUBTRACT)


with BuildPart() as f20_tool129:
    # F20_s130 → F20_t131 (new body)
    with BuildSketch(Plane.XZ.offset(63)):
        with BuildLine():
            ThreePointArc((30, 28), (29.4142135624, 29.4142135624), (28, 30))
            Line((28, 30), (30, 30))
            Line((30, 30), (30, 28))
        make_face()
    extrude(amount=-F20_T131_DEPTH)

    split(bisect_by=Plane.XZ.offset(30), keep=Keep.BOTTOM)


with BuildPart() as f20_tool133:
    # F20_s134 → F20_t135 (new body)
    with BuildSketch(Plane.XY.offset(25)):
        with BuildLine():
            ThreePointArc((30, -28), (29.4142135624, -29.4142135624), (28, -30))
            Line((28, -30), (30, -30))
            Line((30, -30), (30, -28))
        make_face()
    extrude(amount=F20_T135_DEPTH)

    split(bisect_by=Plane.XY.offset(30), keep=Keep.BOTTOM)


with BuildPart() as f20_tool129_1:
    add(f20_tool129.part)

    # F20_t137: intersect F20_tool133
    add(f20_tool133.part, mode=Mode.INTERSECT)


with BuildPart() as f1_18:
    add(f1_17.part)

    # F20_t127: cut F20_tool129
    add(f20_tool129_1.part, mode=Mode.SUBTRACT)


with BuildPart() as f20_tool140:
    # F20_s141 → F20_t142 (new body)
    with BuildSketch(Plane.XZ.offset(25)):
        with BuildLine():
            ThreePointArc((0, 2), (0.5857864376, 0.5857864376), (2, 0))
            Line((2, 0), (0, 0))
            Line((0, 0), (0, 2))
        make_face()
    extrude(amount=F20_T142_DEPTH)

    split(bisect_by=Plane.XZ.offset(30), keep=Keep.BOTTOM)


with BuildPart() as f20_tool144:
    # F20_s145 → F20_t146 (new body)
    with BuildSketch(Plane.YZ.offset(-33)):
        with BuildLine():
            ThreePointArc((-30, 2), (-29.4142135624, 0.5857864376), (-28, 0))
            Line((-28, 0), (-30, 0))
            Line((-30, 0), (-30, 2))
        make_face()
    extrude(amount=F20_T146_DEPTH)

    split(bisect_by=Plane.YZ, keep=Keep.TOP)


with BuildPart() as f20_tool140_1:
    add(f20_tool140.part)

    # F20_t148: intersect F20_tool144
    add(f20_tool144.part, mode=Mode.INTERSECT)


with BuildPart() as f1_19:
    add(f1_18.part)

    # F20_t138: cut F20_tool140
    add(f20_tool140_1.part, mode=Mode.SUBTRACT)


with BuildPart() as f20_tool151:
    # F20_s152 → F20_t153 (new body)
    with BuildSketch(Plane.YZ.offset(5)):
        with BuildLine():
            ThreePointArc((-2, 30), (-0.5857864376, 29.4142135624), (0, 28))
            Line((0, 28), (0, 30))
            Line((0, 30), (-2, 30))
        make_face()
    extrude(amount=-F20_T153_DEPTH)

    split(bisect_by=Plane.YZ, keep=Keep.TOP)


with BuildPart() as f20_tool155:
    # F20_s156 → F20_t157 (new body)
    with BuildSketch(Plane.XY.offset(25)):
        with BuildLine():
            ThreePointArc((0, -2), (0.5857864376, -0.5857864376), (2, 0))
            Line((2, 0), (0, 0))
            Line((0, 0), (0, -2))
        make_face()
    extrude(amount=F20_T157_DEPTH)

    split(bisect_by=Plane.XY.offset(30), keep=Keep.BOTTOM)


with BuildPart() as f20_tool151_1:
    add(f20_tool151.part)

    # F20_t159: intersect F20_tool155
    add(f20_tool155.part, mode=Mode.INTERSECT)


with BuildPart() as f1_20:
    add(f1_19.part)

    # F20_t149: cut F20_tool151
    add(f20_tool151_1.part, mode=Mode.SUBTRACT)

    # F21: fillet of radius 2 on 2 edges, made by hand

    # F21_s2 → F21_t1 (cut)
    with BuildSketch(Plane.XY.offset(30)):
        with BuildLine():
            ThreePointArc((0, -28), (0.5857864376, -29.4142135624), (2, -30))
            Line((2, -30), (0, -30))
            Line((0, -30), (0, -28))
        make_face()
    extrude(amount=F21_T1_DEPTH, mode=Mode.SUBTRACT)

    # F21_s4 → F21_t3 (cut)
    with BuildSketch(Plane.XZ.offset(30)):
        with BuildLine():
            ThreePointArc((0, 28), (0.5857864376, 29.4142135624), (2, 30))
            Line((2, 30), (0, 30))
            Line((0, 30), (0, 28))
        make_face()
    extrude(amount=F21_T3_DEPTH, mode=Mode.SUBTRACT)


with BuildPart() as f21_tool6:
    # F21_s7 → F21_t8 (new body)
    with BuildSketch(Plane.YZ.offset(2)):
        with Locations((-64, 29)):
            Rectangle(F21_S7_W, F21_S7_H)
    extrude(amount=-F21_T8_DEPTH)

    # F21_s9 → F21_t10 (revolve, cut)
    with BuildSketch(Plane(origin=(2, -63, 28), x_dir=(0, 0.7071067812, -0.7071067812), z_dir=(0, 0.7071067812, 0.7071067812))):
        with BuildLine():
            ThreePointArc((0, -2), (2, 0), (0, 2))
            Line((0, 2), (0, -2))
        make_face()
    revolve(axis=Axis((2, -63, 28), (-1, 0, 0)), mode=Mode.SUBTRACT)


with BuildPart() as f1_21:
    add(f1_20.part)

    # F21_t5: cut F21_tool6
    add(f21_tool6.part, mode=Mode.SUBTRACT)


with BuildPart() as f21_tool12:
    # F21_s13 → F21_t14 (new body)
    with BuildSketch(Plane.YZ.offset(2)):
        with Locations((-29, 64)):
            Rectangle(F21_S13_W, F21_S13_H)
    extrude(amount=-F21_T14_DEPTH)

    # F21_s15 → F21_t16 (revolve, cut)
    with BuildSketch(Plane(origin=(2, -28, 63), x_dir=(0, 0.7071067812, -0.7071067812), z_dir=(0, 0.7071067812, 0.7071067812))):
        with BuildLine():
            ThreePointArc((0, -2), (2, 0), (0, 2))
            Line((0, 2), (0, -2))
        make_face()
    revolve(axis=Axis((2, -28, 63), (-1, 0, 0)), mode=Mode.SUBTRACT)


with BuildPart() as f1_22:
    add(f1_21.part)

    # F21_t11: cut F21_tool12
    add(f21_tool12.part, mode=Mode.SUBTRACT)


with BuildPart() as f21_tool19:
    # F21_s20 → F21_t21 (new body)
    with BuildSketch(Plane.XZ.offset(63)):
        with BuildLine():
            ThreePointArc((0, 28), (0.5857864376, 29.4142135624), (2, 30))
            Line((2, 30), (0, 30))
            Line((0, 30), (0, 28))
        make_face()
    extrude(amount=-F21_T21_DEPTH)

    split(bisect_by=Plane.XZ.offset(30), keep=Keep.BOTTOM)

    # F21_s23 → F21_t24 (cut, symmetric)
    with BuildSketch(Plane.YZ.offset(1)):
        with Locations((-28.0000000001, 28.0000000001)):
            Circle(F21_S23_R)
    extrude(amount=F21_T24_DEPTH, both=True, mode=Mode.SUBTRACT)


with BuildPart() as f21_tool25:
    # F21_s26 → F21_t27 (new body)
    with BuildSketch(Plane.XY.offset(63)):
        with BuildLine():
            ThreePointArc((0, -28), (0.5857864376, -29.4142135624), (2, -30))
            Line((2, -30), (0, -30))
            Line((0, -30), (0, -28))
        make_face()
    extrude(amount=-F21_T27_DEPTH)

    # F21_s28 → F21_t29 (cut, symmetric)
    with BuildSketch(Plane.YZ.offset(1)):
        with Locations((-28.0000000001, 28.0000000001)):
            Circle(F21_S28_R)
    extrude(amount=F21_T29_DEPTH, both=True, mode=Mode.SUBTRACT)

    split(bisect_by=Plane.XY.offset(30), keep=Keep.BOTTOM)


with BuildPart() as f21_tool19_1:
    add(f21_tool19.part)

    # F21_t31: intersect F21_tool25
    add(f21_tool25.part, mode=Mode.INTERSECT)


with BuildPart() as f1_23:
    add(f1_22.part)

    # F21_t17: cut F21_tool19
    add(f21_tool19_1.part, mode=Mode.SUBTRACT)


solid = f1_23.part
